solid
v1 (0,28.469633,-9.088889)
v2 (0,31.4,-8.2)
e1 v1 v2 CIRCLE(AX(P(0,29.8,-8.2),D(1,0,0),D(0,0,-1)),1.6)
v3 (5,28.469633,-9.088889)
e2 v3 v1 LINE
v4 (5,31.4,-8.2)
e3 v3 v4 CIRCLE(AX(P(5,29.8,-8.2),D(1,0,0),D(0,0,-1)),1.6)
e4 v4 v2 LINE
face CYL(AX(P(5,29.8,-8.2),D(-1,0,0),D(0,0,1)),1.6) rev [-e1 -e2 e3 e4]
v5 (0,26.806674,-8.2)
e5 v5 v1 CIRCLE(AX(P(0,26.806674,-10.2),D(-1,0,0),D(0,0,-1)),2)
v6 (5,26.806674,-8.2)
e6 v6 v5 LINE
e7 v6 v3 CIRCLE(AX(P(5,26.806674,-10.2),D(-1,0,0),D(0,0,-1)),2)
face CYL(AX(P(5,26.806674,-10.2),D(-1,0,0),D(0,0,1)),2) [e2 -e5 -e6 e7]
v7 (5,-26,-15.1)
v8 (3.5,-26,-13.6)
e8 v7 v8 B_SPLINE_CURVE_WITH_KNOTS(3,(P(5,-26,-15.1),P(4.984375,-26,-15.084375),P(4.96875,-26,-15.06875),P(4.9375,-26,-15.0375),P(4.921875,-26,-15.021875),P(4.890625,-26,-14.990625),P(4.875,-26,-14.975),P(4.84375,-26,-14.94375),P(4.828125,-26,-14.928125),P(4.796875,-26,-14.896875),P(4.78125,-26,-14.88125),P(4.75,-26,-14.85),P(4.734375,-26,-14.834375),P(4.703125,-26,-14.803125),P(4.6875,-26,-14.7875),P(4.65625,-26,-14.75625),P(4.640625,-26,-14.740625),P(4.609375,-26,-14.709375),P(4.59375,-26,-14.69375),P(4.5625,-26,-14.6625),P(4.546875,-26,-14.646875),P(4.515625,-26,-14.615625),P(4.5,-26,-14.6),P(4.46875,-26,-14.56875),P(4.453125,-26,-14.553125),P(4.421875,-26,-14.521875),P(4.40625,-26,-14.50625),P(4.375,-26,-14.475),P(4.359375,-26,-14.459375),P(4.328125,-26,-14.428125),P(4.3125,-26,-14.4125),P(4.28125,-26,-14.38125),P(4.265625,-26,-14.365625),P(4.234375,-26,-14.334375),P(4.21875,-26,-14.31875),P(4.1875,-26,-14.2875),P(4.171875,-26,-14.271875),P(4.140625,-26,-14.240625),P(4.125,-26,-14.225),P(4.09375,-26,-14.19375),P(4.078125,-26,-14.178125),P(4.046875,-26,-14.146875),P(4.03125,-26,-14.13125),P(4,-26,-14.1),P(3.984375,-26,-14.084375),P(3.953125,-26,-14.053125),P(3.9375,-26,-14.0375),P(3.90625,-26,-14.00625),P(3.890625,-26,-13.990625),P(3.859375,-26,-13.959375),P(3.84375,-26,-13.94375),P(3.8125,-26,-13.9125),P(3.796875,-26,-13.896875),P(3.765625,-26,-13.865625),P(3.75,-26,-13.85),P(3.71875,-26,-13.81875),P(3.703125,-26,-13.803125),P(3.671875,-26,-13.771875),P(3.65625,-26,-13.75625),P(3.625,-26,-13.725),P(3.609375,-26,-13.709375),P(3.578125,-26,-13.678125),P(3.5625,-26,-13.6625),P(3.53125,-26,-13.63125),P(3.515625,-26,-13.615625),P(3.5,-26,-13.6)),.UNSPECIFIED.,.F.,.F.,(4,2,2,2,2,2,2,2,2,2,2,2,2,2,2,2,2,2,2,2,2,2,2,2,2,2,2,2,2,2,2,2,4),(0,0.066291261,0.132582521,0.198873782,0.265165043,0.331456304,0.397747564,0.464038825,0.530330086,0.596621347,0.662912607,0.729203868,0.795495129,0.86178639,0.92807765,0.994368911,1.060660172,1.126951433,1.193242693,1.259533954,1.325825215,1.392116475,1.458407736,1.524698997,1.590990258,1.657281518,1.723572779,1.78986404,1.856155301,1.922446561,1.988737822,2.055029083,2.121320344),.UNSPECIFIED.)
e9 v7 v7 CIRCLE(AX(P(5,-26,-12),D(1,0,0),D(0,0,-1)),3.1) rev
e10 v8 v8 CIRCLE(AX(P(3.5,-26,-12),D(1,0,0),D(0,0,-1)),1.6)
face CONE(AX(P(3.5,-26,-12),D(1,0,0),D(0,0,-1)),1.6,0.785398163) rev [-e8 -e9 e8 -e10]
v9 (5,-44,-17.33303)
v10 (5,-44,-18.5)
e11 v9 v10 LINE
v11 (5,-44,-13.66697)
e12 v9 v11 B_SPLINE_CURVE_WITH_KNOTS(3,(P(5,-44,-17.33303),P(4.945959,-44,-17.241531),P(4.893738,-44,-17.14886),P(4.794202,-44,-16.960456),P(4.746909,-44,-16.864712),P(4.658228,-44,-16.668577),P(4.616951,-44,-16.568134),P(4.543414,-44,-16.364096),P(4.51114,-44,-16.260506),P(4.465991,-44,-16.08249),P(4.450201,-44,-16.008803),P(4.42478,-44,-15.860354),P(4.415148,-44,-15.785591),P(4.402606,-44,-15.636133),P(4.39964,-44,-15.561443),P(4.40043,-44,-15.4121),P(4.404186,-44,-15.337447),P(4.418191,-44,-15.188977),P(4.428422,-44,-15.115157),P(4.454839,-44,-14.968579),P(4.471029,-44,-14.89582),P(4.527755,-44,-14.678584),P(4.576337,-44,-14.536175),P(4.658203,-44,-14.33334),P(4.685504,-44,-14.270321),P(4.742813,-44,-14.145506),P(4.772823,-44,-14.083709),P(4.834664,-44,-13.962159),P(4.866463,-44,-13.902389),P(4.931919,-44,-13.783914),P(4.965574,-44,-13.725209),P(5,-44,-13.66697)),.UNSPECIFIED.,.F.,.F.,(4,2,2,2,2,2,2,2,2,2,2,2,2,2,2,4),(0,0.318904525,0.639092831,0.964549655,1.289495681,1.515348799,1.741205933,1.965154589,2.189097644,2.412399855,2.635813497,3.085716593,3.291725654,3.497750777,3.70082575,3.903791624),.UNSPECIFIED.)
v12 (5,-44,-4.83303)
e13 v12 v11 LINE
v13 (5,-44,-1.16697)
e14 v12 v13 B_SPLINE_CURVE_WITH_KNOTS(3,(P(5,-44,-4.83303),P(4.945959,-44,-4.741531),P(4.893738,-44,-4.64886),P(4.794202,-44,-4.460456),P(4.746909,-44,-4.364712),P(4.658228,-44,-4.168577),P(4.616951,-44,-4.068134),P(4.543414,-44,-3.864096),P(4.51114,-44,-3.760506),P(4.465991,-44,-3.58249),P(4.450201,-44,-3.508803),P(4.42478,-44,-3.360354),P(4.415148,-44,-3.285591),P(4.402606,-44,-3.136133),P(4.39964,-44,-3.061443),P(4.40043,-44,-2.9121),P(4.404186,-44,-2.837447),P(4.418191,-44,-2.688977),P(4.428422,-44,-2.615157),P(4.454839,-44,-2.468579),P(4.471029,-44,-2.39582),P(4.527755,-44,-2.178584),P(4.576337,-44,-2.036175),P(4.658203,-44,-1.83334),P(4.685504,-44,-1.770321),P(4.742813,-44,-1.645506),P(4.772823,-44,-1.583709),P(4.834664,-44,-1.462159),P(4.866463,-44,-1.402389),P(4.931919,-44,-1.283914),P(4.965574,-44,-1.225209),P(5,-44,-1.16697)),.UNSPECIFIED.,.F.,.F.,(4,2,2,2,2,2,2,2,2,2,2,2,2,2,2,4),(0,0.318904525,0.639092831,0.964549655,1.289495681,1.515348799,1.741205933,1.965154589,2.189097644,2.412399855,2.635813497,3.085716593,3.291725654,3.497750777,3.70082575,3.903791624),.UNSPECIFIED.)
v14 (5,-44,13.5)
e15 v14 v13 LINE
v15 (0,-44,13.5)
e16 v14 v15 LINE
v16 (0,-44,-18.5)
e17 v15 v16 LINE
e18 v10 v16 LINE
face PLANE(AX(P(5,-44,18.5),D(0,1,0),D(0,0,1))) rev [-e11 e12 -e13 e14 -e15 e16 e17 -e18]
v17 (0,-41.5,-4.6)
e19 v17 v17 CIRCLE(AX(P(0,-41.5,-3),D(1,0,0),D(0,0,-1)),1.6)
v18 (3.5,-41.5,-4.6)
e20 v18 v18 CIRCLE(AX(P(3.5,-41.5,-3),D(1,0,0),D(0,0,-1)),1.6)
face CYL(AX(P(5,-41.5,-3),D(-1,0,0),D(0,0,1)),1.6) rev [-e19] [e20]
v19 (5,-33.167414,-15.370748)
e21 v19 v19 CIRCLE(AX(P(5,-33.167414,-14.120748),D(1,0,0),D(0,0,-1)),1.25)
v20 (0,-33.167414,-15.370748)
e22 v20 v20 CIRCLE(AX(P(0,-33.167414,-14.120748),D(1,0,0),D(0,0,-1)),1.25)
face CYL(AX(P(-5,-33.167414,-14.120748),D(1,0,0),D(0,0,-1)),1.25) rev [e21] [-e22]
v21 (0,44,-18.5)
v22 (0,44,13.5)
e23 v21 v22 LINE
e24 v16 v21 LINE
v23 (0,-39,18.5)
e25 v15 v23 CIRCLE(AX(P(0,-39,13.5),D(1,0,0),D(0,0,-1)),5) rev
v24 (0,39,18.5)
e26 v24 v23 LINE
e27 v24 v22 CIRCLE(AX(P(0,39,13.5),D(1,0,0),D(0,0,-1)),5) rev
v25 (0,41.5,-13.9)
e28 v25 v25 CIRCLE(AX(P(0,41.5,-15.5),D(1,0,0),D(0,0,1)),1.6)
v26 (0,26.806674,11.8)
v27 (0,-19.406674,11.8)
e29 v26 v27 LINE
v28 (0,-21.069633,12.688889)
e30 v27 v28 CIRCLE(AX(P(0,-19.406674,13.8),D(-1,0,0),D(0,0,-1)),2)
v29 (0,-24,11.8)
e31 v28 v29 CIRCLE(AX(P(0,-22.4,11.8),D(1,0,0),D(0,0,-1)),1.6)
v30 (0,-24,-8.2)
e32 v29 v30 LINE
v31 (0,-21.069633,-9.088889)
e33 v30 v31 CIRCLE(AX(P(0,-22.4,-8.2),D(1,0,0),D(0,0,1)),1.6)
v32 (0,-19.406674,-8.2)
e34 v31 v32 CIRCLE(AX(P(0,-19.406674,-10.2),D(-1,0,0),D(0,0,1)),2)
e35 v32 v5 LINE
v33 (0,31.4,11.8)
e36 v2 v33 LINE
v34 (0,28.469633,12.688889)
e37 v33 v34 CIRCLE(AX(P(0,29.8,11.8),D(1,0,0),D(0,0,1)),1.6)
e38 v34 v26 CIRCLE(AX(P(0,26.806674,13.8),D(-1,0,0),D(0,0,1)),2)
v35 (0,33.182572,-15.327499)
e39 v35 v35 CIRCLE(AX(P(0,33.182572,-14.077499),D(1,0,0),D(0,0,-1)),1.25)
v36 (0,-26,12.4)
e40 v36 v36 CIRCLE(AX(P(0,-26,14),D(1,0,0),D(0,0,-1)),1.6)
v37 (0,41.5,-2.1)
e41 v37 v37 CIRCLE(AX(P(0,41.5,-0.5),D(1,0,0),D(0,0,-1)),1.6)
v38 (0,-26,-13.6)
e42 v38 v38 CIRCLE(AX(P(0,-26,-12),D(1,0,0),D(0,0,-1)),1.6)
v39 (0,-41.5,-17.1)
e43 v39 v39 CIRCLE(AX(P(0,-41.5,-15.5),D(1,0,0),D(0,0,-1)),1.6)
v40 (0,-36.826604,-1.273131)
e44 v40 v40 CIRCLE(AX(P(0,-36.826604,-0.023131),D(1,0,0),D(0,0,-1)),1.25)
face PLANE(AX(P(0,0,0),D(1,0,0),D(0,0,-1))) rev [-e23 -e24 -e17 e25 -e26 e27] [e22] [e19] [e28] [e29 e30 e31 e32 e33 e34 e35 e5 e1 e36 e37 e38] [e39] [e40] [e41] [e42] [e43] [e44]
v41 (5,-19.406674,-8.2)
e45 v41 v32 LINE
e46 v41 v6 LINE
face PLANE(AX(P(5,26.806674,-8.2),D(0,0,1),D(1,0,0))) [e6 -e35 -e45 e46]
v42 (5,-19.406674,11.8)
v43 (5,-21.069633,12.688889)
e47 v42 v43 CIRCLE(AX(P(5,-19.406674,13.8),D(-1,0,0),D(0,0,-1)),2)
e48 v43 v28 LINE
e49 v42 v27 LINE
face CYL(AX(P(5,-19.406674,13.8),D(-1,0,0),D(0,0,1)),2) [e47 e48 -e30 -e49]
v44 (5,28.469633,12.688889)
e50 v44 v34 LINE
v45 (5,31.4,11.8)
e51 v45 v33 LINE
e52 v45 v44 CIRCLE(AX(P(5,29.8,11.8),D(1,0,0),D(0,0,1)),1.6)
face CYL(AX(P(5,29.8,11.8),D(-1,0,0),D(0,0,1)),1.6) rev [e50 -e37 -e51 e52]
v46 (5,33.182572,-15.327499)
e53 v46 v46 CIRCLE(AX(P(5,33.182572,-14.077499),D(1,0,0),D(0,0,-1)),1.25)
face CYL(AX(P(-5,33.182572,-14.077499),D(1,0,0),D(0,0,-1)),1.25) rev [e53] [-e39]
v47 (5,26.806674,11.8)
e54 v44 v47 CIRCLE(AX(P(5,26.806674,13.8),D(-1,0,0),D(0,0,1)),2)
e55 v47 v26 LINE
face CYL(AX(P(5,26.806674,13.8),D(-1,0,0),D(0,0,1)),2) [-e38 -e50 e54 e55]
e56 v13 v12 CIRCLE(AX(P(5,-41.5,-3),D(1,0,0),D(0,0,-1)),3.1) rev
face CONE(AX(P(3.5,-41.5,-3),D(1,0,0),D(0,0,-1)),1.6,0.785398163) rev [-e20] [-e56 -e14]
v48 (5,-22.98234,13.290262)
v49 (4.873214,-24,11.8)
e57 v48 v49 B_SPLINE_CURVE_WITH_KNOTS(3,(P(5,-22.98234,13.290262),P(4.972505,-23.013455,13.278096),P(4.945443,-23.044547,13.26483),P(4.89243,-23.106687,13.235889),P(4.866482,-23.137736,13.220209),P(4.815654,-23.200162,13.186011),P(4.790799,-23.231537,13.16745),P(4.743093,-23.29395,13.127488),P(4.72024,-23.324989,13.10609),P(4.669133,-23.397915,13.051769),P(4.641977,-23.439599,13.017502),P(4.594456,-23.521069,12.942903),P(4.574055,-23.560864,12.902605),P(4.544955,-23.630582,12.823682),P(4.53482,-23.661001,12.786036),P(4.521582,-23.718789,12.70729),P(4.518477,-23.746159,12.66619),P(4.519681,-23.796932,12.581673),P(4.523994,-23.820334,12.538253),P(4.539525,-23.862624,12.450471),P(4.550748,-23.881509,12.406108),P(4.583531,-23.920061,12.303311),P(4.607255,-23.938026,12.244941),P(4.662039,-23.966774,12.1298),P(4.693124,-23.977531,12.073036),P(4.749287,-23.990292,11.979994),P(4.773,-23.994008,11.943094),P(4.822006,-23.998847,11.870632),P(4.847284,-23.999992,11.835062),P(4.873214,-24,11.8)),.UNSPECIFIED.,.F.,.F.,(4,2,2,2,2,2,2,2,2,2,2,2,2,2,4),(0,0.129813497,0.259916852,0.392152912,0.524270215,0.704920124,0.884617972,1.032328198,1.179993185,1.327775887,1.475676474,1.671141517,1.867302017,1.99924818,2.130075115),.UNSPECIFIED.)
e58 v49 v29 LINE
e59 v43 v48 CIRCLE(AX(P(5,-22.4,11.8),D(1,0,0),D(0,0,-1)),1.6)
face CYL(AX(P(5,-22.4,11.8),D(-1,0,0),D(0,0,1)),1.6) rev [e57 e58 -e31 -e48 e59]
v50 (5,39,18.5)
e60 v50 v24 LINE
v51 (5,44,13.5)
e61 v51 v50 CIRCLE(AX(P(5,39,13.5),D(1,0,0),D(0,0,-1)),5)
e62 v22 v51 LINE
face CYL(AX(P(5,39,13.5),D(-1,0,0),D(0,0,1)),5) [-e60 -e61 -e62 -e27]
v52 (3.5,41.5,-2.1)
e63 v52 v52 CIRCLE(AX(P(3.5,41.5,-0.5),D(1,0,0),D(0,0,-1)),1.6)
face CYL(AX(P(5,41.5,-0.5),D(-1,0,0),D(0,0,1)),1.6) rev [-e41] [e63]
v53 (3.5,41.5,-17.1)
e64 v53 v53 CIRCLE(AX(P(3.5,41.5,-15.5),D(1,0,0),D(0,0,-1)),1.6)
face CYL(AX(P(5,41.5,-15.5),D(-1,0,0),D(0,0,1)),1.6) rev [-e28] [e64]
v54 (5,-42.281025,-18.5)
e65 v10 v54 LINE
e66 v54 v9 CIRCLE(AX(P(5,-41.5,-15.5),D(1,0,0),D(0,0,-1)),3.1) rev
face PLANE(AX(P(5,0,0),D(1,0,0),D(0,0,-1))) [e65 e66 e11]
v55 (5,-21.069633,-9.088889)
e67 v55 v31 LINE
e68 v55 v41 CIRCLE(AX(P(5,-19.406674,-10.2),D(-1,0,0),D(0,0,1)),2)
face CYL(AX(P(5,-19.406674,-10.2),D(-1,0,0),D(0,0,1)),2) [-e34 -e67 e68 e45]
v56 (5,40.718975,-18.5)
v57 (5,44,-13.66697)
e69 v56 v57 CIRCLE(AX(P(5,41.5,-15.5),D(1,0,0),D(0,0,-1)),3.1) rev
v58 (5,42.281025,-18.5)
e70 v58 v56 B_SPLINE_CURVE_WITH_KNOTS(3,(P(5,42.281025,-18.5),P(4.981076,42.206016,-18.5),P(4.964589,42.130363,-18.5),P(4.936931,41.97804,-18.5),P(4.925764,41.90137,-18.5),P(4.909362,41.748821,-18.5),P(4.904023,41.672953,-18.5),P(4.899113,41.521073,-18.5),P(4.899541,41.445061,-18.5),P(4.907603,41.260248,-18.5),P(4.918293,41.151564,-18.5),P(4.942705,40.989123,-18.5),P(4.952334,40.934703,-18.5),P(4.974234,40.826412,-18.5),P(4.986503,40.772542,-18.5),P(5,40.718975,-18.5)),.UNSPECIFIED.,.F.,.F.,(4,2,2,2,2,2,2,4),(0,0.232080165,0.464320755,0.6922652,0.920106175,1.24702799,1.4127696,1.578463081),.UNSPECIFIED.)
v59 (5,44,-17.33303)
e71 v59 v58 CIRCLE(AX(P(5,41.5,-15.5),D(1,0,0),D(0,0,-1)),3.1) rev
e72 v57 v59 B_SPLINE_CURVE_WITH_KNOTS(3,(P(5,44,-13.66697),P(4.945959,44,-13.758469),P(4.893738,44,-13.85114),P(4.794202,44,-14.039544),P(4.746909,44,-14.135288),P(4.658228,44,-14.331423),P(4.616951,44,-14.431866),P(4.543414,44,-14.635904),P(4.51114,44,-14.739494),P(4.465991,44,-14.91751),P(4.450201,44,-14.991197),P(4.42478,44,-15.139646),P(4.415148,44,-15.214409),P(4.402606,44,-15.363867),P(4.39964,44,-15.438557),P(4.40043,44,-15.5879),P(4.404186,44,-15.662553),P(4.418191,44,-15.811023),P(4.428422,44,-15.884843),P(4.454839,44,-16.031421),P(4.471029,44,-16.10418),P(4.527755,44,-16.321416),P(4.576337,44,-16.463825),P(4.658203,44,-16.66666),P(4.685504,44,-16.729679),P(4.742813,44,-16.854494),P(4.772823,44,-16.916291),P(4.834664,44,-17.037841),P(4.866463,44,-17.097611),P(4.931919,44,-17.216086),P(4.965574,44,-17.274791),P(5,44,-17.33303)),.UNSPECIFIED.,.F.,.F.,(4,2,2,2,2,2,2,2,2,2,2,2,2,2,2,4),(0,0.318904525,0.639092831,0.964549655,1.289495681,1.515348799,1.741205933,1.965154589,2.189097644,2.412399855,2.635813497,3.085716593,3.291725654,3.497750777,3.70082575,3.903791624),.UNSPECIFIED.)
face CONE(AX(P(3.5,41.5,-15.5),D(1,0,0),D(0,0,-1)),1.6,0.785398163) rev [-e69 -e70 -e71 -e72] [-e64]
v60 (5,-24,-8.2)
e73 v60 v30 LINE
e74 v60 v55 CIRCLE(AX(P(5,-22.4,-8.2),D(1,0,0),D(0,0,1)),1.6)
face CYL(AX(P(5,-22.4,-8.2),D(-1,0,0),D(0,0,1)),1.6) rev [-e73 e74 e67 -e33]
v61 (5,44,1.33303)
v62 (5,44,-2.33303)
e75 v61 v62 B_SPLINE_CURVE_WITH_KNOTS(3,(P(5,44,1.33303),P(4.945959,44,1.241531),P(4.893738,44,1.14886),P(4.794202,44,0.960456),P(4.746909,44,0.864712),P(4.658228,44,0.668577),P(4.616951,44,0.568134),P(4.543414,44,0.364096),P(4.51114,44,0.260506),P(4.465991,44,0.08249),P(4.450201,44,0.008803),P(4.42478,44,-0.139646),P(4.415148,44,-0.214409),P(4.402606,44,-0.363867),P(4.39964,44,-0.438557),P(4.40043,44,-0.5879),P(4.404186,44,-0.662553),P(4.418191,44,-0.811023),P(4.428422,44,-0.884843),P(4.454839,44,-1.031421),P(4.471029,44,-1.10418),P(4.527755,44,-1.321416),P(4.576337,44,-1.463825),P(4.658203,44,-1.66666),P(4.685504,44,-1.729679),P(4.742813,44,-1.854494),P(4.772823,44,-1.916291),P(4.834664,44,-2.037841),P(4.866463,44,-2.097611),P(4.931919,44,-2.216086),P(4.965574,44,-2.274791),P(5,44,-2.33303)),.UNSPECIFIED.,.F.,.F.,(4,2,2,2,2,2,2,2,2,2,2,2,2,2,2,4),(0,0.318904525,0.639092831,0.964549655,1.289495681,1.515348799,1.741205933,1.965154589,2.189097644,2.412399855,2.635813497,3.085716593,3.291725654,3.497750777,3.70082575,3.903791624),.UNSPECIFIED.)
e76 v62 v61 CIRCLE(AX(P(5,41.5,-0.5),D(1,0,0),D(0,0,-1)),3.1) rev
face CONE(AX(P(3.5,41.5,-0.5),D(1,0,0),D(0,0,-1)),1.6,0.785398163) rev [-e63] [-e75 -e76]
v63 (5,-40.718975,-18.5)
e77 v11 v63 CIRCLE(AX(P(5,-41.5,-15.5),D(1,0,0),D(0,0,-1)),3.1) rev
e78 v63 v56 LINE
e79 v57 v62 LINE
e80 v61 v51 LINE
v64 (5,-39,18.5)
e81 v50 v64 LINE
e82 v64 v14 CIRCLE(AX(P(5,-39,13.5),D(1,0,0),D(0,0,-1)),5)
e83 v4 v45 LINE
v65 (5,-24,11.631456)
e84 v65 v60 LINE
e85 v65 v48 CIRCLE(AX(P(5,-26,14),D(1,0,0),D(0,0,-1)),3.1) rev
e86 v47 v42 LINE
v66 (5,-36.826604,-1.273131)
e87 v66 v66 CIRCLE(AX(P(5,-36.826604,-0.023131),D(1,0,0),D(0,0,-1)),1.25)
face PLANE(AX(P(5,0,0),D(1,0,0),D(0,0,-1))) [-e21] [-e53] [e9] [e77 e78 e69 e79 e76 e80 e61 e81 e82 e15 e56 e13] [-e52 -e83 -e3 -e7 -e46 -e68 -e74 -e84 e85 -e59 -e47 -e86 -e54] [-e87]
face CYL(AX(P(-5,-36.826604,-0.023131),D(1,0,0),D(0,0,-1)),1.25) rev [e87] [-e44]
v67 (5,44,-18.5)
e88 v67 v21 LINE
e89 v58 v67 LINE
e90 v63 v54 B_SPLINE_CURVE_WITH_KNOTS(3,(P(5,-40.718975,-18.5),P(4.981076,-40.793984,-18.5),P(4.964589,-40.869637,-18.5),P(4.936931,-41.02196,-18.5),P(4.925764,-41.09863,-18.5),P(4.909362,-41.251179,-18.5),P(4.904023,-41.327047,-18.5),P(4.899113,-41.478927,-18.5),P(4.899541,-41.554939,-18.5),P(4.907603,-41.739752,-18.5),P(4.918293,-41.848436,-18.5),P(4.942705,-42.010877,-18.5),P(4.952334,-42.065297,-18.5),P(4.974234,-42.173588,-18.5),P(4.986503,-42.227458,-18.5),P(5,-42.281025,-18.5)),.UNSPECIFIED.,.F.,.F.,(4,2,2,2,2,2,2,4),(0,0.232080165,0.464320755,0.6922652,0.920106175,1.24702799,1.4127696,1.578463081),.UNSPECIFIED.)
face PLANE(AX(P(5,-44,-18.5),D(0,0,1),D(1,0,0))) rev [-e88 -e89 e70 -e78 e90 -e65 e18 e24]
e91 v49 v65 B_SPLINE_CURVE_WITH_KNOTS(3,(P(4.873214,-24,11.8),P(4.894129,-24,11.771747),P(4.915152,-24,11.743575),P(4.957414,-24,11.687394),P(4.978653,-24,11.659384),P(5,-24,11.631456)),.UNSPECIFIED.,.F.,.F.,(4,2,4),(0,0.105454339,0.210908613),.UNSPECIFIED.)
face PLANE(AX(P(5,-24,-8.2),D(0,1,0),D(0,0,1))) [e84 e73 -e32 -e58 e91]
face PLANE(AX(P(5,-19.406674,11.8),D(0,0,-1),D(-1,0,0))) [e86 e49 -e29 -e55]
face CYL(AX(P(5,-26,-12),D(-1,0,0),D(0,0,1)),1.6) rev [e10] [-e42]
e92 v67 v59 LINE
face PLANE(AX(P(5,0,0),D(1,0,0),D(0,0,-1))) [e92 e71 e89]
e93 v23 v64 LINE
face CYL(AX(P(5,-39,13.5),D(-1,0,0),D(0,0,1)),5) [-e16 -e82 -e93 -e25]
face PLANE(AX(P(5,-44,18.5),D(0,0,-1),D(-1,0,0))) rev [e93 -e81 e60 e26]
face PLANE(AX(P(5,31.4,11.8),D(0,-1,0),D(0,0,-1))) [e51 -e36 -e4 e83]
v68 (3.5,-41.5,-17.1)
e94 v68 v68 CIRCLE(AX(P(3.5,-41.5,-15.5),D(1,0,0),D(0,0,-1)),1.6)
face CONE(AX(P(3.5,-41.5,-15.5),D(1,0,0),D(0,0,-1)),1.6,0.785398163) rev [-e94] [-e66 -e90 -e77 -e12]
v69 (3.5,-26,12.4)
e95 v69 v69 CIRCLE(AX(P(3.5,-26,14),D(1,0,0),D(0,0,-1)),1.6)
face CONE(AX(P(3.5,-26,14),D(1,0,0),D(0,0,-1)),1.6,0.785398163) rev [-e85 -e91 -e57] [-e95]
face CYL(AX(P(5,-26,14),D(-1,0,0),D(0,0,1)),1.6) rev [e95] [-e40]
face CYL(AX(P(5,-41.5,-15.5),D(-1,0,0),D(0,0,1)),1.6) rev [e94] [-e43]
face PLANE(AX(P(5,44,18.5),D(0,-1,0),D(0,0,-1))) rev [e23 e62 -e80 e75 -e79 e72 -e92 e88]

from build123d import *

# Parameters (mm, degrees)
SKETCH1_W           = 88
SKETCH1_H           = 37
SKETCH1_R           = 1.6
BOSS_EXTRUDE1_DEPTH = 5
FILLET1_R           = 5
CHAMFER2_SIZE       = 1.5
SKETCH2_R           = 1.25
CUT_EXTRUDE1_DEPTH  = 10


with BuildPart() as part:
    # Sketch1 → Boss-Extrude1 (new body)
    with BuildSketch(Plane.YZ):
        Rectangle(SKETCH1_W, SKETCH1_H)
        with Locations(Location((-41.5, -15.5, 0), (0, 0, 270))):
            Circle(SKETCH1_R, mode=Mode.SUBTRACT)
        with Locations(Location((-41.5, -3, 0), (0, 0, 270))):
            Circle(SKETCH1_R, mode=Mode.SUBTRACT)
        with Locations(Location((41.5, -15.5, 0), (0, 0, 90))):
            Circle(SKETCH1_R, mode=Mode.SUBTRACT)
        with Locations(Location((-26, 14, 0), (0, 0, 270))):
            Circle(SKETCH1_R, mode=Mode.SUBTRACT)
        with Locations(Location((-26, -12, 0), (0, 0, 270))):
            Circle(SKETCH1_R, mode=Mode.SUBTRACT)
        with Locations(Location((41.5, -0.5, 0), (0, 0, 270))):
            Circle(SKETCH1_R, mode=Mode.SUBTRACT)
        with BuildLine():
            Line((-24, -8.2), (-24, 11.8))
            ThreePointArc((-24, 11.8), (-22.86444197, 13.331108636), (-21.069632929, 12.688888889))
            ThreePointArc((-21.069632929, 12.688888889), (-20.349483132, 12.036165793), (-19.406674091, 11.8))
            Line((-19.406674091, 11.8), (26.806674091, 11.8))
            ThreePointArc((26.806674091, 11.8), (27.749483132, 12.036165793), (28.469632929, 12.688888889))
            ThreePointArc((28.469632929, 12.688888889), (30.26444197, 13.331108636), (31.4, 11.8))
            Line((31.4, 11.8), (31.4, -8.2))
            ThreePointArc((31.4, -8.2), (30.26444197, -9.731108636), (28.469632929, -9.088888889))
            ThreePointArc((28.469632929, -9.088888889), (27.749483132, -8.436165793), (26.806674091, -8.2))
            Line((26.806674091, -8.2), (-19.406674091, -8.2))
            ThreePointArc((-19.406674091, -8.2), (-20.349483132, -8.436165793), (-21.069632929, -9.088888889))
            ThreePointArc((-21.069632929, -9.088888889), (-22.86444197, -9.731108636), (-24, -8.2))
        make_face(mode=Mode.SUBTRACT)
    extrude(amount=BOSS_EXTRUDE1_DEPTH)

    # Fillet1
    fillet1_edges = [part.edges().sort_by_distance(p)[0] for p in [
        (2.5, -44, 18.5),
        (2.5, 44, 18.5),
    ]]
    fillet(fillet1_edges, radius=FILLET1_R)

    # Chamfer2
    # the kernel refuses this chamfer: 1.5 mm, written as the material it takes off along each edge
    with BuildSketch(Plane(origin=(5, -41.5, -15.5), x_dir=(0, 0, -1), z_dir=(0, -1, 0))) as chamfer2_piece_1:
        Polygon((1.6 + CHAMFER2_SIZE, 0), (1.6, -CHAMFER2_SIZE), (1.6, 0), align=None)
    revolve(axis=Axis((5, -41.5, -15.5), (1, 0, 0)), mode=Mode.SUBTRACT)
    with BuildSketch(Plane(origin=(5, -41.5, -3), x_dir=(0, 0, -1), z_dir=(0, -1, 0))) as chamfer2_piece_2:
        Polygon((1.6 + CHAMFER2_SIZE, 0), (1.6, -CHAMFER2_SIZE), (1.6, 0), align=None)
    revolve(axis=Axis((5, -41.5, -3), (1, 0, 0)), mode=Mode.SUBTRACT)
    with BuildSketch(Plane(origin=(5, 41.5, -0.5), x_dir=(0, 0, -1), z_dir=(0, -1, 0))) as chamfer2_piece_3:
        Polygon((1.6 + CHAMFER2_SIZE, 0), (1.6, -CHAMFER2_SIZE), (1.6, 0), align=None)
    revolve(axis=Axis((5, 41.5, -0.5), (1, 0, 0)), mode=Mode.SUBTRACT)
    with BuildSketch(Plane(origin=(5, 41.5, -15.5), x_dir=(0, 0, 1), z_dir=(0, 1, 0))) as chamfer2_piece_4:
        Polygon((1.6 + CHAMFER2_SIZE, 0), (1.6, -CHAMFER2_SIZE), (1.6, 0), align=None)
    revolve(axis=Axis((5, 41.5, -15.5), (1, 0, 0)), mode=Mode.SUBTRACT)
    with BuildSketch(Plane(origin=(5, -26, 14), x_dir=(0, 0, -1), z_dir=(0, -1, 0))) as chamfer2_piece_5:
        Polygon((1.6 + CHAMFER2_SIZE, 0), (1.6, -CHAMFER2_SIZE), (1.6, 0), align=None)
    revolve(axis=Axis((5, -26, 14), (1, 0, 0)), mode=Mode.SUBTRACT)
    with BuildSketch(Plane(origin=(5, -26, -12), x_dir=(0, 0, -1), z_dir=(0, -1, 0))) as chamfer2_piece_6:
        Polygon((1.6 + CHAMFER2_SIZE, 0), (1.6, -CHAMFER2_SIZE), (1.6, 0), align=None)
    revolve(axis=Axis((5, -26, -12), (1, 0, 0)), mode=Mode.SUBTRACT)

    # Sketch2 → Cut-Extrude1 (cut)
    with BuildSketch(Plane.YZ.offset(5)):
        with Locations(Location((-36.826603685, -0.023130638, 0), (0, 0, 270))):
            Circle(SKETCH2_R)
        with Locations(Location((-33.167413509, -14.120748425, 0), (0, 0, 270))):
            Circle(SKETCH2_R)
        with Locations(Location((33.182572395, -14.077498807, 0), (0, 0, 270))):
            Circle(SKETCH2_R)
    extrude(amount=-CUT_EXTRUDE1_DEPTH, mode=Mode.SUBTRACT)


solid = part.part
